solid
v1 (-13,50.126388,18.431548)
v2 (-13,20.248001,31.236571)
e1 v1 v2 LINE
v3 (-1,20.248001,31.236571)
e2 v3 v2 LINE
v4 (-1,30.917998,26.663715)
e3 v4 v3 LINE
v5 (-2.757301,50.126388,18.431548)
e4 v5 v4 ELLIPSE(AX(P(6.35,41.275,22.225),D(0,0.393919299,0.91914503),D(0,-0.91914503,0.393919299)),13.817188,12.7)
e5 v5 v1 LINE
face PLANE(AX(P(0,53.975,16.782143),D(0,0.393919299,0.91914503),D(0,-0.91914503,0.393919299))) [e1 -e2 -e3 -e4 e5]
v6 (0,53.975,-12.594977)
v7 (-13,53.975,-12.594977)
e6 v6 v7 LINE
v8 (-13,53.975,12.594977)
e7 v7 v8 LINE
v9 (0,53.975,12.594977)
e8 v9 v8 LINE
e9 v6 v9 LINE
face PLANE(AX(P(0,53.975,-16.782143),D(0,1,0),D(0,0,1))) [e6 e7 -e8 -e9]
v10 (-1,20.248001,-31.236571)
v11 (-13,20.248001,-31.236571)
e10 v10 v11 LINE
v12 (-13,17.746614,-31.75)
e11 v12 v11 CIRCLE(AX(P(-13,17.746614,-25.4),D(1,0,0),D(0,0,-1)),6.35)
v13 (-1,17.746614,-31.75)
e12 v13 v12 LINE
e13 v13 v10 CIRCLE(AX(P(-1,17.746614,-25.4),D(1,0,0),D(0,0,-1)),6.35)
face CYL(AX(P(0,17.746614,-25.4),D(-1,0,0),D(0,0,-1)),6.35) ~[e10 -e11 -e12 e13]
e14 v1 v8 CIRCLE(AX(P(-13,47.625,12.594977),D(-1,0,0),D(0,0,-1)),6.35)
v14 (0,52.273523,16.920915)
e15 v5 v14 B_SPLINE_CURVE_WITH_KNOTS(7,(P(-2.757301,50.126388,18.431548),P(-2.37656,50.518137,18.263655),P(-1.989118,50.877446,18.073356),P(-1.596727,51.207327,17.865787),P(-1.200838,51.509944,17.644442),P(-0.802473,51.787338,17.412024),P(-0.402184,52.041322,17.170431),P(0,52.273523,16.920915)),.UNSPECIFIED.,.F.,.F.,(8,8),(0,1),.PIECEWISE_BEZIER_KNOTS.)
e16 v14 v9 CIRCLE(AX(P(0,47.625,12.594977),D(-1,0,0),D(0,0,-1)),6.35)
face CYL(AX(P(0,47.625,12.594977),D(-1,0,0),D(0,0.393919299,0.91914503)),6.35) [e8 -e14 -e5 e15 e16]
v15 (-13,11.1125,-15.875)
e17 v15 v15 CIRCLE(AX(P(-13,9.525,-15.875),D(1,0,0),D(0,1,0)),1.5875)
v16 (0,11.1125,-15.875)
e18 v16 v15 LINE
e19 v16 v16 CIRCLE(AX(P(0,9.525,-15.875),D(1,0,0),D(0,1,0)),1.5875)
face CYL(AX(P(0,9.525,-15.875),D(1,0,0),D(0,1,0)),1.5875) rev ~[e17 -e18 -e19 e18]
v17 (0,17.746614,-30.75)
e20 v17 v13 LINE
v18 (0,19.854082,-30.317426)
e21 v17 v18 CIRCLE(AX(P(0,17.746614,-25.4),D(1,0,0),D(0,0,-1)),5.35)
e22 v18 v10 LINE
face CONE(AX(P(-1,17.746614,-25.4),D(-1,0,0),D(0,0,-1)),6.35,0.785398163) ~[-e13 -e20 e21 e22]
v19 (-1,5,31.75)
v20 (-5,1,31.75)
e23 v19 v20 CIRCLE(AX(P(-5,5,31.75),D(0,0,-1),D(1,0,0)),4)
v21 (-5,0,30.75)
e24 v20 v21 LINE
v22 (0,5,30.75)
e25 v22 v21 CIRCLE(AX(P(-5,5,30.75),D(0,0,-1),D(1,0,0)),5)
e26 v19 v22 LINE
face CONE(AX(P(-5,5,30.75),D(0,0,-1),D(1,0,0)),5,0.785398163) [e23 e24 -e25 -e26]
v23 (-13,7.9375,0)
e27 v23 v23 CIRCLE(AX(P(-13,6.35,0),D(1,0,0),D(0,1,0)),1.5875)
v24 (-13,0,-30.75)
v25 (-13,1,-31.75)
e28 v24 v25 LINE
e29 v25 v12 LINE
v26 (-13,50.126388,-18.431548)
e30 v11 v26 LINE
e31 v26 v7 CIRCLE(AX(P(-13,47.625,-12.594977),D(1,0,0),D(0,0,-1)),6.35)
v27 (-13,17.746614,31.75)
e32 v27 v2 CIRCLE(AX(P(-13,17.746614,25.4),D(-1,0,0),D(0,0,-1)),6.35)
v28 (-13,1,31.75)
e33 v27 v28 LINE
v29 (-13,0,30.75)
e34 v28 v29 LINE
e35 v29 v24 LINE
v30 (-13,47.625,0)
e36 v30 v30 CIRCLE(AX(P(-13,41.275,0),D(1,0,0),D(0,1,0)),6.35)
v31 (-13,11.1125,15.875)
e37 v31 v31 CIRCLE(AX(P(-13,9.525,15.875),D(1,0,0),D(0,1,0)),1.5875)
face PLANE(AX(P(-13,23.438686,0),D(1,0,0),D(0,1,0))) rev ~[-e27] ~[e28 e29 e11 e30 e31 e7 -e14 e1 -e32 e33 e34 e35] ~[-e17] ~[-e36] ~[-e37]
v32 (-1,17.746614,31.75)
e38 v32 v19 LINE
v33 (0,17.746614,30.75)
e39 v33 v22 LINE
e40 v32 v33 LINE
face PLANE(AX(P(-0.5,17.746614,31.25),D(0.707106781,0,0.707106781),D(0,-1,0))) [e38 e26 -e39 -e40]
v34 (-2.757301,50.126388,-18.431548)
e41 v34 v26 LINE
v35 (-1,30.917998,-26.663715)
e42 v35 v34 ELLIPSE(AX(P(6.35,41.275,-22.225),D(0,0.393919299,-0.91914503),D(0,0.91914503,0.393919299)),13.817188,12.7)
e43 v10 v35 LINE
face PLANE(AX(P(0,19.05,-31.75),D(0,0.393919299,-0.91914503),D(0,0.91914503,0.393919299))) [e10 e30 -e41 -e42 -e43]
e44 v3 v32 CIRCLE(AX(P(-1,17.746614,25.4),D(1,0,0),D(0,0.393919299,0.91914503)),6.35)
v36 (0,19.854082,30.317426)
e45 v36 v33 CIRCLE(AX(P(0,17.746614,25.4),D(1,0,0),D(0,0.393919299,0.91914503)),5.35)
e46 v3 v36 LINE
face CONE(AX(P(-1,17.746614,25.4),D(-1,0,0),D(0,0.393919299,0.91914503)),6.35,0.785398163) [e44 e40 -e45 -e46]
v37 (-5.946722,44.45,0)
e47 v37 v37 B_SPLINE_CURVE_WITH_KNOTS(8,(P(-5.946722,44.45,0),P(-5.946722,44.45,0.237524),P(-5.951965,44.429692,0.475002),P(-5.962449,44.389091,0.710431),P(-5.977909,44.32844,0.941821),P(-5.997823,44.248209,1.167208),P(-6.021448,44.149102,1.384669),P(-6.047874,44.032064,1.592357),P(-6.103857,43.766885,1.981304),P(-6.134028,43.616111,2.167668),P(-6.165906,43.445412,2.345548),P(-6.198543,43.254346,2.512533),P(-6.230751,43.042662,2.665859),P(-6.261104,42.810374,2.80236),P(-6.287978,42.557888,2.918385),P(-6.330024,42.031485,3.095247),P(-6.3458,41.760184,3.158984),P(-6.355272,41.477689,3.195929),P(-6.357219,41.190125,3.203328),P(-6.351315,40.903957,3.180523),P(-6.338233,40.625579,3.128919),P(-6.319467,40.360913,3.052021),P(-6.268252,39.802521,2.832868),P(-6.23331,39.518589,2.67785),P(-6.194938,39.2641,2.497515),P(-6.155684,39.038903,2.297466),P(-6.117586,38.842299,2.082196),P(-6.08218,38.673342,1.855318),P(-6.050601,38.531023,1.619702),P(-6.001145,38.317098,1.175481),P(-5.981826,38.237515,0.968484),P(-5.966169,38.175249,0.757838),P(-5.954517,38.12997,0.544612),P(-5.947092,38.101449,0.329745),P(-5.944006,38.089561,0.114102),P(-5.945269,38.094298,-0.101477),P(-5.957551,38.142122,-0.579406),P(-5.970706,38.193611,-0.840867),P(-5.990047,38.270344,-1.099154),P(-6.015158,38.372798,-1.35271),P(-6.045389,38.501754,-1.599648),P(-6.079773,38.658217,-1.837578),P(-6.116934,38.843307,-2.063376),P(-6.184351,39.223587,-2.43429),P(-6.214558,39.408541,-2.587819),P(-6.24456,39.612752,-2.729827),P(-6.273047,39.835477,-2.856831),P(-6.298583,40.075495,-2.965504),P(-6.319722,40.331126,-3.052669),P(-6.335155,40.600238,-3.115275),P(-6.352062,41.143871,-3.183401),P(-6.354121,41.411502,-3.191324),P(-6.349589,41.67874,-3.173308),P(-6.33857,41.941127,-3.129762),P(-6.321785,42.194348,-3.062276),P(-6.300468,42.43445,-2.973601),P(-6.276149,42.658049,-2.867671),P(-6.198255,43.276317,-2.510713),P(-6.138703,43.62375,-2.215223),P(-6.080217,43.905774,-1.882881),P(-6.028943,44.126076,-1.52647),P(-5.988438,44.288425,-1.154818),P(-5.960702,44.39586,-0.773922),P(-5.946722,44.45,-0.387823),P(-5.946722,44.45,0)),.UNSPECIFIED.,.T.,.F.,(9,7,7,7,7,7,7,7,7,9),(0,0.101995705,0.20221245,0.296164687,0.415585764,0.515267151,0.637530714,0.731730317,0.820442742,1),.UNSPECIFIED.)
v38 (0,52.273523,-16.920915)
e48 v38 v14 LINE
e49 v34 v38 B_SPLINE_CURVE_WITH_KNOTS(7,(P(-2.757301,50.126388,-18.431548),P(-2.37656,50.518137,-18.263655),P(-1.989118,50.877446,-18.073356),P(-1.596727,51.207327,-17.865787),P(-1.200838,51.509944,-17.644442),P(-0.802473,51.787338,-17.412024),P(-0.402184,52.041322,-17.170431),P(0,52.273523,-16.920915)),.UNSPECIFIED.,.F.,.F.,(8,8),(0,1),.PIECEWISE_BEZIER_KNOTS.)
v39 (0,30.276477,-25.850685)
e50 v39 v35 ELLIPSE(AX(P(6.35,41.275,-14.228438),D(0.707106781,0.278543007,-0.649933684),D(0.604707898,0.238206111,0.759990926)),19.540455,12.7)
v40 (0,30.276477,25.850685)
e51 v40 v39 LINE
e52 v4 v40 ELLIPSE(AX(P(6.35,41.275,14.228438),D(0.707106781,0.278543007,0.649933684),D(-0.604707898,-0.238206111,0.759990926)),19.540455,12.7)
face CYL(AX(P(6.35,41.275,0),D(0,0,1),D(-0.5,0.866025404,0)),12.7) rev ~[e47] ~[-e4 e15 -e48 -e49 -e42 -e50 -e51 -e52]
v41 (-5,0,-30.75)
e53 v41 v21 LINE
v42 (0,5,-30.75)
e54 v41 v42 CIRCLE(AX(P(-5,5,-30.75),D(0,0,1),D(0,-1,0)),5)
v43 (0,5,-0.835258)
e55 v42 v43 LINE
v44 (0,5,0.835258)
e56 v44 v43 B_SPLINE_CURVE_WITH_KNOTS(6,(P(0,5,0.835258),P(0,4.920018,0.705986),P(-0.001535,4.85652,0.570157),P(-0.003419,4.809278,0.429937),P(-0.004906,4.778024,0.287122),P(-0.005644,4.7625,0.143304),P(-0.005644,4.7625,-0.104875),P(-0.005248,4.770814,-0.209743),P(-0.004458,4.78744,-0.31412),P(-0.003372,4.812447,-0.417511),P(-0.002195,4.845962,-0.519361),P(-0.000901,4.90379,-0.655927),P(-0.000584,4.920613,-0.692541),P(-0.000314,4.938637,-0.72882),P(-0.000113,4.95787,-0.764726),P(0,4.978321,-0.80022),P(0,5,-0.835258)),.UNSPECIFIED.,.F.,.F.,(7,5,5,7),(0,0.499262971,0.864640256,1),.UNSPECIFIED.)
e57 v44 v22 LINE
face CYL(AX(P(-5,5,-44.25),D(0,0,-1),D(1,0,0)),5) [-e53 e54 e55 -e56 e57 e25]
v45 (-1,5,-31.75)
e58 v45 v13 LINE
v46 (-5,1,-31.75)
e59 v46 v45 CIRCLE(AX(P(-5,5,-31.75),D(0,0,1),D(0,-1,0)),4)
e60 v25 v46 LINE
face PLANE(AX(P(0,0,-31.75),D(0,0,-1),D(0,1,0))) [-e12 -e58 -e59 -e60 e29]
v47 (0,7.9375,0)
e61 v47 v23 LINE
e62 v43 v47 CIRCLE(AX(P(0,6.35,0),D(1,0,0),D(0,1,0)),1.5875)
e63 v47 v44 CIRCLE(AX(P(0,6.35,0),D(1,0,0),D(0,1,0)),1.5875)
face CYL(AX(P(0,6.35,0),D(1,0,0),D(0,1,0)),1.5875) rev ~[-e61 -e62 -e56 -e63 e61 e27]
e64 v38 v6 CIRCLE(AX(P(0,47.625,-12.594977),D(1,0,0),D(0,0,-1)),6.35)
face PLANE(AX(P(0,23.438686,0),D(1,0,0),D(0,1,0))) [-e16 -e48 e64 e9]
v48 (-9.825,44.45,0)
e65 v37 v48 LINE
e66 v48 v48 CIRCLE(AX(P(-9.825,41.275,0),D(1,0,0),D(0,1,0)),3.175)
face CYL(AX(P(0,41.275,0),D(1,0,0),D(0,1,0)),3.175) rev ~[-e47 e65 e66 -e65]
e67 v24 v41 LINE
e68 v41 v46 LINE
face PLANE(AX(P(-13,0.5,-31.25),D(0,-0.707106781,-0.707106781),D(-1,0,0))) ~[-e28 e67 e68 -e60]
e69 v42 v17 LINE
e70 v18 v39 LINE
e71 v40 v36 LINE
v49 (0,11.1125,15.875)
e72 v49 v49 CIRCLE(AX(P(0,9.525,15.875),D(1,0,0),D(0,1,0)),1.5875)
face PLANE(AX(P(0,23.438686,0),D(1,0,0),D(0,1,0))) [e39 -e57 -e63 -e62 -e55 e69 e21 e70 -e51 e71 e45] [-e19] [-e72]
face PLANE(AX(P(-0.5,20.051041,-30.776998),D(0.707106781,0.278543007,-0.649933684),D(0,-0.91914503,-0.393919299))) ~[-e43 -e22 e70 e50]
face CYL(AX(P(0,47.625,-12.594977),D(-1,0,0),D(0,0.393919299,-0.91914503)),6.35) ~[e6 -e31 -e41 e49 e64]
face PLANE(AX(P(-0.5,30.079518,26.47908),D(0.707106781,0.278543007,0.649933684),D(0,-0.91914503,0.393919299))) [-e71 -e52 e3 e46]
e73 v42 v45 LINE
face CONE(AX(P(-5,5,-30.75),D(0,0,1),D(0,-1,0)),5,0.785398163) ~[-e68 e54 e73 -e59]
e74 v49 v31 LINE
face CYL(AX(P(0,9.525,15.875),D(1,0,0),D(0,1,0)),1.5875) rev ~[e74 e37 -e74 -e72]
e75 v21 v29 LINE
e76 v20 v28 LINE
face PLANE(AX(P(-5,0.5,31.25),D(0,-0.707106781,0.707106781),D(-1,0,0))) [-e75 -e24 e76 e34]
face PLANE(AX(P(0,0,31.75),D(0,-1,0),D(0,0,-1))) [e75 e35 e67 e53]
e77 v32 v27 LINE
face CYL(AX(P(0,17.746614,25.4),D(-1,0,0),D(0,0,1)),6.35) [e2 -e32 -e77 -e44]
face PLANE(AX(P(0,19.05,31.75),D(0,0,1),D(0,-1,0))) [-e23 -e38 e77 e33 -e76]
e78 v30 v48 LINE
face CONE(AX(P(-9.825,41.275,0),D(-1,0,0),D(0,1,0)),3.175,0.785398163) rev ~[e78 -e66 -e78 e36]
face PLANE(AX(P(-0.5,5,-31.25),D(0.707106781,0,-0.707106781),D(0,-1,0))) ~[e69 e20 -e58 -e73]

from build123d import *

# Parameters (mm, degrees)
F0_R        = 1.5875
F0_R_2      = 3.175
F1_DEPTH    = 13
F3_DEPTH    = 37.5
F4_R        = 6.35
F5_T1_DEPTH = 88.5
F6_SIZE     = 1
F7_SIZE     = 3.175


# Not quite as in the source:
# - a fillet or chamfer that OpenCascade refuses, or shapes differently, is made with other operations: its cross-section is extruded or revolved along the edge and cut away or added
# - a feature names something its author has since deleted; it is built from what else it names


with BuildPart() as f1:
    # F0 (on Right) → F1 (new body)
    with BuildSketch(Plane.YZ):
        Polygon((0, 31.75), (0, 0), (0, -31.75), (19.05, -31.75), (53.975, -16.7821428571), (53.975, 16.7821428571), (19.05, 31.75), align=None)
        with Locations((9.525, -15.875)):
            Circle(F0_R, mode=Mode.SUBTRACT)
        with Locations((6.35, 0)):
            Circle(F0_R, mode=Mode.SUBTRACT)
        with Locations((9.525, 15.875)):
            Circle(F0_R, mode=Mode.SUBTRACT)
        with Locations((41.275, 0)):
            Circle(F0_R_2, mode=Mode.SUBTRACT)
    extrude(amount=-F1_DEPTH)

    # F2 (on Top) → F3 (cut, symmetric)
    with BuildSketch(Plane.XY):
        with BuildLine():
            Line((0, 30.2764773719), (0, 52.2735226281))
            ThreePointArc((0, 52.2735226281), (-6.35, 41.275), (0, 30.2764773719))
        make_face()
    extrude(amount=F3_DEPTH, both=True, mode=Mode.SUBTRACT)

    # F4
    f4_edges = [f1.edges().sort_by_distance(p)[0] for p in [
        (-6.5, 19.05, 31.75),
        (-6.5, 19.05, -31.75),
        (-6.5, 53.975, 16.782143),
        (-6.5, 53.975, -16.782143),
    ]]
    fillet(f4_edges, radius=F4_R)

    # F5: fillet of radius 5 on 1 edges, made by hand

    # F5_s2 → F5_t1 (cut)
    with BuildSketch(Plane.XY.offset(-44.25)):
        with BuildLine():
            ThreePointArc((0, 5), (-1.4644660941, 1.4644660941), (-5, 0))
            Line((-5, 0), (0, 0))
            Line((0, 0), (0, 5))
        make_face()
    extrude(amount=F5_T1_DEPTH, mode=Mode.SUBTRACT)

    # F6
    f6_edges = [f1.edges().sort_by_distance(p)[0] for p in [
        (0, 11.373307, 31.75),
        (0, 25.262239, -29.087612),
        (0, 25.262239, 29.087612),
        (0, 19.023382, -31.620319),
        (0, 11.373307, -31.75),
        (0, 19.023382, 31.620319),
        (-9, 0, -31.75),
        (-1.464466, 1.464466, -31.75),
        (-1.464466, 1.464466, 31.75),
        (-9, 0, 31.75),
    ]]
    chamfer(f6_edges, length=F6_SIZE)

    # F7
    f7_edges = [f1.edges().sort_by_distance(p)[0] for p in [
        (-13, 38.1, 0),
    ]]
    chamfer(f7_edges, length=F7_SIZE)


solid = f1.part
